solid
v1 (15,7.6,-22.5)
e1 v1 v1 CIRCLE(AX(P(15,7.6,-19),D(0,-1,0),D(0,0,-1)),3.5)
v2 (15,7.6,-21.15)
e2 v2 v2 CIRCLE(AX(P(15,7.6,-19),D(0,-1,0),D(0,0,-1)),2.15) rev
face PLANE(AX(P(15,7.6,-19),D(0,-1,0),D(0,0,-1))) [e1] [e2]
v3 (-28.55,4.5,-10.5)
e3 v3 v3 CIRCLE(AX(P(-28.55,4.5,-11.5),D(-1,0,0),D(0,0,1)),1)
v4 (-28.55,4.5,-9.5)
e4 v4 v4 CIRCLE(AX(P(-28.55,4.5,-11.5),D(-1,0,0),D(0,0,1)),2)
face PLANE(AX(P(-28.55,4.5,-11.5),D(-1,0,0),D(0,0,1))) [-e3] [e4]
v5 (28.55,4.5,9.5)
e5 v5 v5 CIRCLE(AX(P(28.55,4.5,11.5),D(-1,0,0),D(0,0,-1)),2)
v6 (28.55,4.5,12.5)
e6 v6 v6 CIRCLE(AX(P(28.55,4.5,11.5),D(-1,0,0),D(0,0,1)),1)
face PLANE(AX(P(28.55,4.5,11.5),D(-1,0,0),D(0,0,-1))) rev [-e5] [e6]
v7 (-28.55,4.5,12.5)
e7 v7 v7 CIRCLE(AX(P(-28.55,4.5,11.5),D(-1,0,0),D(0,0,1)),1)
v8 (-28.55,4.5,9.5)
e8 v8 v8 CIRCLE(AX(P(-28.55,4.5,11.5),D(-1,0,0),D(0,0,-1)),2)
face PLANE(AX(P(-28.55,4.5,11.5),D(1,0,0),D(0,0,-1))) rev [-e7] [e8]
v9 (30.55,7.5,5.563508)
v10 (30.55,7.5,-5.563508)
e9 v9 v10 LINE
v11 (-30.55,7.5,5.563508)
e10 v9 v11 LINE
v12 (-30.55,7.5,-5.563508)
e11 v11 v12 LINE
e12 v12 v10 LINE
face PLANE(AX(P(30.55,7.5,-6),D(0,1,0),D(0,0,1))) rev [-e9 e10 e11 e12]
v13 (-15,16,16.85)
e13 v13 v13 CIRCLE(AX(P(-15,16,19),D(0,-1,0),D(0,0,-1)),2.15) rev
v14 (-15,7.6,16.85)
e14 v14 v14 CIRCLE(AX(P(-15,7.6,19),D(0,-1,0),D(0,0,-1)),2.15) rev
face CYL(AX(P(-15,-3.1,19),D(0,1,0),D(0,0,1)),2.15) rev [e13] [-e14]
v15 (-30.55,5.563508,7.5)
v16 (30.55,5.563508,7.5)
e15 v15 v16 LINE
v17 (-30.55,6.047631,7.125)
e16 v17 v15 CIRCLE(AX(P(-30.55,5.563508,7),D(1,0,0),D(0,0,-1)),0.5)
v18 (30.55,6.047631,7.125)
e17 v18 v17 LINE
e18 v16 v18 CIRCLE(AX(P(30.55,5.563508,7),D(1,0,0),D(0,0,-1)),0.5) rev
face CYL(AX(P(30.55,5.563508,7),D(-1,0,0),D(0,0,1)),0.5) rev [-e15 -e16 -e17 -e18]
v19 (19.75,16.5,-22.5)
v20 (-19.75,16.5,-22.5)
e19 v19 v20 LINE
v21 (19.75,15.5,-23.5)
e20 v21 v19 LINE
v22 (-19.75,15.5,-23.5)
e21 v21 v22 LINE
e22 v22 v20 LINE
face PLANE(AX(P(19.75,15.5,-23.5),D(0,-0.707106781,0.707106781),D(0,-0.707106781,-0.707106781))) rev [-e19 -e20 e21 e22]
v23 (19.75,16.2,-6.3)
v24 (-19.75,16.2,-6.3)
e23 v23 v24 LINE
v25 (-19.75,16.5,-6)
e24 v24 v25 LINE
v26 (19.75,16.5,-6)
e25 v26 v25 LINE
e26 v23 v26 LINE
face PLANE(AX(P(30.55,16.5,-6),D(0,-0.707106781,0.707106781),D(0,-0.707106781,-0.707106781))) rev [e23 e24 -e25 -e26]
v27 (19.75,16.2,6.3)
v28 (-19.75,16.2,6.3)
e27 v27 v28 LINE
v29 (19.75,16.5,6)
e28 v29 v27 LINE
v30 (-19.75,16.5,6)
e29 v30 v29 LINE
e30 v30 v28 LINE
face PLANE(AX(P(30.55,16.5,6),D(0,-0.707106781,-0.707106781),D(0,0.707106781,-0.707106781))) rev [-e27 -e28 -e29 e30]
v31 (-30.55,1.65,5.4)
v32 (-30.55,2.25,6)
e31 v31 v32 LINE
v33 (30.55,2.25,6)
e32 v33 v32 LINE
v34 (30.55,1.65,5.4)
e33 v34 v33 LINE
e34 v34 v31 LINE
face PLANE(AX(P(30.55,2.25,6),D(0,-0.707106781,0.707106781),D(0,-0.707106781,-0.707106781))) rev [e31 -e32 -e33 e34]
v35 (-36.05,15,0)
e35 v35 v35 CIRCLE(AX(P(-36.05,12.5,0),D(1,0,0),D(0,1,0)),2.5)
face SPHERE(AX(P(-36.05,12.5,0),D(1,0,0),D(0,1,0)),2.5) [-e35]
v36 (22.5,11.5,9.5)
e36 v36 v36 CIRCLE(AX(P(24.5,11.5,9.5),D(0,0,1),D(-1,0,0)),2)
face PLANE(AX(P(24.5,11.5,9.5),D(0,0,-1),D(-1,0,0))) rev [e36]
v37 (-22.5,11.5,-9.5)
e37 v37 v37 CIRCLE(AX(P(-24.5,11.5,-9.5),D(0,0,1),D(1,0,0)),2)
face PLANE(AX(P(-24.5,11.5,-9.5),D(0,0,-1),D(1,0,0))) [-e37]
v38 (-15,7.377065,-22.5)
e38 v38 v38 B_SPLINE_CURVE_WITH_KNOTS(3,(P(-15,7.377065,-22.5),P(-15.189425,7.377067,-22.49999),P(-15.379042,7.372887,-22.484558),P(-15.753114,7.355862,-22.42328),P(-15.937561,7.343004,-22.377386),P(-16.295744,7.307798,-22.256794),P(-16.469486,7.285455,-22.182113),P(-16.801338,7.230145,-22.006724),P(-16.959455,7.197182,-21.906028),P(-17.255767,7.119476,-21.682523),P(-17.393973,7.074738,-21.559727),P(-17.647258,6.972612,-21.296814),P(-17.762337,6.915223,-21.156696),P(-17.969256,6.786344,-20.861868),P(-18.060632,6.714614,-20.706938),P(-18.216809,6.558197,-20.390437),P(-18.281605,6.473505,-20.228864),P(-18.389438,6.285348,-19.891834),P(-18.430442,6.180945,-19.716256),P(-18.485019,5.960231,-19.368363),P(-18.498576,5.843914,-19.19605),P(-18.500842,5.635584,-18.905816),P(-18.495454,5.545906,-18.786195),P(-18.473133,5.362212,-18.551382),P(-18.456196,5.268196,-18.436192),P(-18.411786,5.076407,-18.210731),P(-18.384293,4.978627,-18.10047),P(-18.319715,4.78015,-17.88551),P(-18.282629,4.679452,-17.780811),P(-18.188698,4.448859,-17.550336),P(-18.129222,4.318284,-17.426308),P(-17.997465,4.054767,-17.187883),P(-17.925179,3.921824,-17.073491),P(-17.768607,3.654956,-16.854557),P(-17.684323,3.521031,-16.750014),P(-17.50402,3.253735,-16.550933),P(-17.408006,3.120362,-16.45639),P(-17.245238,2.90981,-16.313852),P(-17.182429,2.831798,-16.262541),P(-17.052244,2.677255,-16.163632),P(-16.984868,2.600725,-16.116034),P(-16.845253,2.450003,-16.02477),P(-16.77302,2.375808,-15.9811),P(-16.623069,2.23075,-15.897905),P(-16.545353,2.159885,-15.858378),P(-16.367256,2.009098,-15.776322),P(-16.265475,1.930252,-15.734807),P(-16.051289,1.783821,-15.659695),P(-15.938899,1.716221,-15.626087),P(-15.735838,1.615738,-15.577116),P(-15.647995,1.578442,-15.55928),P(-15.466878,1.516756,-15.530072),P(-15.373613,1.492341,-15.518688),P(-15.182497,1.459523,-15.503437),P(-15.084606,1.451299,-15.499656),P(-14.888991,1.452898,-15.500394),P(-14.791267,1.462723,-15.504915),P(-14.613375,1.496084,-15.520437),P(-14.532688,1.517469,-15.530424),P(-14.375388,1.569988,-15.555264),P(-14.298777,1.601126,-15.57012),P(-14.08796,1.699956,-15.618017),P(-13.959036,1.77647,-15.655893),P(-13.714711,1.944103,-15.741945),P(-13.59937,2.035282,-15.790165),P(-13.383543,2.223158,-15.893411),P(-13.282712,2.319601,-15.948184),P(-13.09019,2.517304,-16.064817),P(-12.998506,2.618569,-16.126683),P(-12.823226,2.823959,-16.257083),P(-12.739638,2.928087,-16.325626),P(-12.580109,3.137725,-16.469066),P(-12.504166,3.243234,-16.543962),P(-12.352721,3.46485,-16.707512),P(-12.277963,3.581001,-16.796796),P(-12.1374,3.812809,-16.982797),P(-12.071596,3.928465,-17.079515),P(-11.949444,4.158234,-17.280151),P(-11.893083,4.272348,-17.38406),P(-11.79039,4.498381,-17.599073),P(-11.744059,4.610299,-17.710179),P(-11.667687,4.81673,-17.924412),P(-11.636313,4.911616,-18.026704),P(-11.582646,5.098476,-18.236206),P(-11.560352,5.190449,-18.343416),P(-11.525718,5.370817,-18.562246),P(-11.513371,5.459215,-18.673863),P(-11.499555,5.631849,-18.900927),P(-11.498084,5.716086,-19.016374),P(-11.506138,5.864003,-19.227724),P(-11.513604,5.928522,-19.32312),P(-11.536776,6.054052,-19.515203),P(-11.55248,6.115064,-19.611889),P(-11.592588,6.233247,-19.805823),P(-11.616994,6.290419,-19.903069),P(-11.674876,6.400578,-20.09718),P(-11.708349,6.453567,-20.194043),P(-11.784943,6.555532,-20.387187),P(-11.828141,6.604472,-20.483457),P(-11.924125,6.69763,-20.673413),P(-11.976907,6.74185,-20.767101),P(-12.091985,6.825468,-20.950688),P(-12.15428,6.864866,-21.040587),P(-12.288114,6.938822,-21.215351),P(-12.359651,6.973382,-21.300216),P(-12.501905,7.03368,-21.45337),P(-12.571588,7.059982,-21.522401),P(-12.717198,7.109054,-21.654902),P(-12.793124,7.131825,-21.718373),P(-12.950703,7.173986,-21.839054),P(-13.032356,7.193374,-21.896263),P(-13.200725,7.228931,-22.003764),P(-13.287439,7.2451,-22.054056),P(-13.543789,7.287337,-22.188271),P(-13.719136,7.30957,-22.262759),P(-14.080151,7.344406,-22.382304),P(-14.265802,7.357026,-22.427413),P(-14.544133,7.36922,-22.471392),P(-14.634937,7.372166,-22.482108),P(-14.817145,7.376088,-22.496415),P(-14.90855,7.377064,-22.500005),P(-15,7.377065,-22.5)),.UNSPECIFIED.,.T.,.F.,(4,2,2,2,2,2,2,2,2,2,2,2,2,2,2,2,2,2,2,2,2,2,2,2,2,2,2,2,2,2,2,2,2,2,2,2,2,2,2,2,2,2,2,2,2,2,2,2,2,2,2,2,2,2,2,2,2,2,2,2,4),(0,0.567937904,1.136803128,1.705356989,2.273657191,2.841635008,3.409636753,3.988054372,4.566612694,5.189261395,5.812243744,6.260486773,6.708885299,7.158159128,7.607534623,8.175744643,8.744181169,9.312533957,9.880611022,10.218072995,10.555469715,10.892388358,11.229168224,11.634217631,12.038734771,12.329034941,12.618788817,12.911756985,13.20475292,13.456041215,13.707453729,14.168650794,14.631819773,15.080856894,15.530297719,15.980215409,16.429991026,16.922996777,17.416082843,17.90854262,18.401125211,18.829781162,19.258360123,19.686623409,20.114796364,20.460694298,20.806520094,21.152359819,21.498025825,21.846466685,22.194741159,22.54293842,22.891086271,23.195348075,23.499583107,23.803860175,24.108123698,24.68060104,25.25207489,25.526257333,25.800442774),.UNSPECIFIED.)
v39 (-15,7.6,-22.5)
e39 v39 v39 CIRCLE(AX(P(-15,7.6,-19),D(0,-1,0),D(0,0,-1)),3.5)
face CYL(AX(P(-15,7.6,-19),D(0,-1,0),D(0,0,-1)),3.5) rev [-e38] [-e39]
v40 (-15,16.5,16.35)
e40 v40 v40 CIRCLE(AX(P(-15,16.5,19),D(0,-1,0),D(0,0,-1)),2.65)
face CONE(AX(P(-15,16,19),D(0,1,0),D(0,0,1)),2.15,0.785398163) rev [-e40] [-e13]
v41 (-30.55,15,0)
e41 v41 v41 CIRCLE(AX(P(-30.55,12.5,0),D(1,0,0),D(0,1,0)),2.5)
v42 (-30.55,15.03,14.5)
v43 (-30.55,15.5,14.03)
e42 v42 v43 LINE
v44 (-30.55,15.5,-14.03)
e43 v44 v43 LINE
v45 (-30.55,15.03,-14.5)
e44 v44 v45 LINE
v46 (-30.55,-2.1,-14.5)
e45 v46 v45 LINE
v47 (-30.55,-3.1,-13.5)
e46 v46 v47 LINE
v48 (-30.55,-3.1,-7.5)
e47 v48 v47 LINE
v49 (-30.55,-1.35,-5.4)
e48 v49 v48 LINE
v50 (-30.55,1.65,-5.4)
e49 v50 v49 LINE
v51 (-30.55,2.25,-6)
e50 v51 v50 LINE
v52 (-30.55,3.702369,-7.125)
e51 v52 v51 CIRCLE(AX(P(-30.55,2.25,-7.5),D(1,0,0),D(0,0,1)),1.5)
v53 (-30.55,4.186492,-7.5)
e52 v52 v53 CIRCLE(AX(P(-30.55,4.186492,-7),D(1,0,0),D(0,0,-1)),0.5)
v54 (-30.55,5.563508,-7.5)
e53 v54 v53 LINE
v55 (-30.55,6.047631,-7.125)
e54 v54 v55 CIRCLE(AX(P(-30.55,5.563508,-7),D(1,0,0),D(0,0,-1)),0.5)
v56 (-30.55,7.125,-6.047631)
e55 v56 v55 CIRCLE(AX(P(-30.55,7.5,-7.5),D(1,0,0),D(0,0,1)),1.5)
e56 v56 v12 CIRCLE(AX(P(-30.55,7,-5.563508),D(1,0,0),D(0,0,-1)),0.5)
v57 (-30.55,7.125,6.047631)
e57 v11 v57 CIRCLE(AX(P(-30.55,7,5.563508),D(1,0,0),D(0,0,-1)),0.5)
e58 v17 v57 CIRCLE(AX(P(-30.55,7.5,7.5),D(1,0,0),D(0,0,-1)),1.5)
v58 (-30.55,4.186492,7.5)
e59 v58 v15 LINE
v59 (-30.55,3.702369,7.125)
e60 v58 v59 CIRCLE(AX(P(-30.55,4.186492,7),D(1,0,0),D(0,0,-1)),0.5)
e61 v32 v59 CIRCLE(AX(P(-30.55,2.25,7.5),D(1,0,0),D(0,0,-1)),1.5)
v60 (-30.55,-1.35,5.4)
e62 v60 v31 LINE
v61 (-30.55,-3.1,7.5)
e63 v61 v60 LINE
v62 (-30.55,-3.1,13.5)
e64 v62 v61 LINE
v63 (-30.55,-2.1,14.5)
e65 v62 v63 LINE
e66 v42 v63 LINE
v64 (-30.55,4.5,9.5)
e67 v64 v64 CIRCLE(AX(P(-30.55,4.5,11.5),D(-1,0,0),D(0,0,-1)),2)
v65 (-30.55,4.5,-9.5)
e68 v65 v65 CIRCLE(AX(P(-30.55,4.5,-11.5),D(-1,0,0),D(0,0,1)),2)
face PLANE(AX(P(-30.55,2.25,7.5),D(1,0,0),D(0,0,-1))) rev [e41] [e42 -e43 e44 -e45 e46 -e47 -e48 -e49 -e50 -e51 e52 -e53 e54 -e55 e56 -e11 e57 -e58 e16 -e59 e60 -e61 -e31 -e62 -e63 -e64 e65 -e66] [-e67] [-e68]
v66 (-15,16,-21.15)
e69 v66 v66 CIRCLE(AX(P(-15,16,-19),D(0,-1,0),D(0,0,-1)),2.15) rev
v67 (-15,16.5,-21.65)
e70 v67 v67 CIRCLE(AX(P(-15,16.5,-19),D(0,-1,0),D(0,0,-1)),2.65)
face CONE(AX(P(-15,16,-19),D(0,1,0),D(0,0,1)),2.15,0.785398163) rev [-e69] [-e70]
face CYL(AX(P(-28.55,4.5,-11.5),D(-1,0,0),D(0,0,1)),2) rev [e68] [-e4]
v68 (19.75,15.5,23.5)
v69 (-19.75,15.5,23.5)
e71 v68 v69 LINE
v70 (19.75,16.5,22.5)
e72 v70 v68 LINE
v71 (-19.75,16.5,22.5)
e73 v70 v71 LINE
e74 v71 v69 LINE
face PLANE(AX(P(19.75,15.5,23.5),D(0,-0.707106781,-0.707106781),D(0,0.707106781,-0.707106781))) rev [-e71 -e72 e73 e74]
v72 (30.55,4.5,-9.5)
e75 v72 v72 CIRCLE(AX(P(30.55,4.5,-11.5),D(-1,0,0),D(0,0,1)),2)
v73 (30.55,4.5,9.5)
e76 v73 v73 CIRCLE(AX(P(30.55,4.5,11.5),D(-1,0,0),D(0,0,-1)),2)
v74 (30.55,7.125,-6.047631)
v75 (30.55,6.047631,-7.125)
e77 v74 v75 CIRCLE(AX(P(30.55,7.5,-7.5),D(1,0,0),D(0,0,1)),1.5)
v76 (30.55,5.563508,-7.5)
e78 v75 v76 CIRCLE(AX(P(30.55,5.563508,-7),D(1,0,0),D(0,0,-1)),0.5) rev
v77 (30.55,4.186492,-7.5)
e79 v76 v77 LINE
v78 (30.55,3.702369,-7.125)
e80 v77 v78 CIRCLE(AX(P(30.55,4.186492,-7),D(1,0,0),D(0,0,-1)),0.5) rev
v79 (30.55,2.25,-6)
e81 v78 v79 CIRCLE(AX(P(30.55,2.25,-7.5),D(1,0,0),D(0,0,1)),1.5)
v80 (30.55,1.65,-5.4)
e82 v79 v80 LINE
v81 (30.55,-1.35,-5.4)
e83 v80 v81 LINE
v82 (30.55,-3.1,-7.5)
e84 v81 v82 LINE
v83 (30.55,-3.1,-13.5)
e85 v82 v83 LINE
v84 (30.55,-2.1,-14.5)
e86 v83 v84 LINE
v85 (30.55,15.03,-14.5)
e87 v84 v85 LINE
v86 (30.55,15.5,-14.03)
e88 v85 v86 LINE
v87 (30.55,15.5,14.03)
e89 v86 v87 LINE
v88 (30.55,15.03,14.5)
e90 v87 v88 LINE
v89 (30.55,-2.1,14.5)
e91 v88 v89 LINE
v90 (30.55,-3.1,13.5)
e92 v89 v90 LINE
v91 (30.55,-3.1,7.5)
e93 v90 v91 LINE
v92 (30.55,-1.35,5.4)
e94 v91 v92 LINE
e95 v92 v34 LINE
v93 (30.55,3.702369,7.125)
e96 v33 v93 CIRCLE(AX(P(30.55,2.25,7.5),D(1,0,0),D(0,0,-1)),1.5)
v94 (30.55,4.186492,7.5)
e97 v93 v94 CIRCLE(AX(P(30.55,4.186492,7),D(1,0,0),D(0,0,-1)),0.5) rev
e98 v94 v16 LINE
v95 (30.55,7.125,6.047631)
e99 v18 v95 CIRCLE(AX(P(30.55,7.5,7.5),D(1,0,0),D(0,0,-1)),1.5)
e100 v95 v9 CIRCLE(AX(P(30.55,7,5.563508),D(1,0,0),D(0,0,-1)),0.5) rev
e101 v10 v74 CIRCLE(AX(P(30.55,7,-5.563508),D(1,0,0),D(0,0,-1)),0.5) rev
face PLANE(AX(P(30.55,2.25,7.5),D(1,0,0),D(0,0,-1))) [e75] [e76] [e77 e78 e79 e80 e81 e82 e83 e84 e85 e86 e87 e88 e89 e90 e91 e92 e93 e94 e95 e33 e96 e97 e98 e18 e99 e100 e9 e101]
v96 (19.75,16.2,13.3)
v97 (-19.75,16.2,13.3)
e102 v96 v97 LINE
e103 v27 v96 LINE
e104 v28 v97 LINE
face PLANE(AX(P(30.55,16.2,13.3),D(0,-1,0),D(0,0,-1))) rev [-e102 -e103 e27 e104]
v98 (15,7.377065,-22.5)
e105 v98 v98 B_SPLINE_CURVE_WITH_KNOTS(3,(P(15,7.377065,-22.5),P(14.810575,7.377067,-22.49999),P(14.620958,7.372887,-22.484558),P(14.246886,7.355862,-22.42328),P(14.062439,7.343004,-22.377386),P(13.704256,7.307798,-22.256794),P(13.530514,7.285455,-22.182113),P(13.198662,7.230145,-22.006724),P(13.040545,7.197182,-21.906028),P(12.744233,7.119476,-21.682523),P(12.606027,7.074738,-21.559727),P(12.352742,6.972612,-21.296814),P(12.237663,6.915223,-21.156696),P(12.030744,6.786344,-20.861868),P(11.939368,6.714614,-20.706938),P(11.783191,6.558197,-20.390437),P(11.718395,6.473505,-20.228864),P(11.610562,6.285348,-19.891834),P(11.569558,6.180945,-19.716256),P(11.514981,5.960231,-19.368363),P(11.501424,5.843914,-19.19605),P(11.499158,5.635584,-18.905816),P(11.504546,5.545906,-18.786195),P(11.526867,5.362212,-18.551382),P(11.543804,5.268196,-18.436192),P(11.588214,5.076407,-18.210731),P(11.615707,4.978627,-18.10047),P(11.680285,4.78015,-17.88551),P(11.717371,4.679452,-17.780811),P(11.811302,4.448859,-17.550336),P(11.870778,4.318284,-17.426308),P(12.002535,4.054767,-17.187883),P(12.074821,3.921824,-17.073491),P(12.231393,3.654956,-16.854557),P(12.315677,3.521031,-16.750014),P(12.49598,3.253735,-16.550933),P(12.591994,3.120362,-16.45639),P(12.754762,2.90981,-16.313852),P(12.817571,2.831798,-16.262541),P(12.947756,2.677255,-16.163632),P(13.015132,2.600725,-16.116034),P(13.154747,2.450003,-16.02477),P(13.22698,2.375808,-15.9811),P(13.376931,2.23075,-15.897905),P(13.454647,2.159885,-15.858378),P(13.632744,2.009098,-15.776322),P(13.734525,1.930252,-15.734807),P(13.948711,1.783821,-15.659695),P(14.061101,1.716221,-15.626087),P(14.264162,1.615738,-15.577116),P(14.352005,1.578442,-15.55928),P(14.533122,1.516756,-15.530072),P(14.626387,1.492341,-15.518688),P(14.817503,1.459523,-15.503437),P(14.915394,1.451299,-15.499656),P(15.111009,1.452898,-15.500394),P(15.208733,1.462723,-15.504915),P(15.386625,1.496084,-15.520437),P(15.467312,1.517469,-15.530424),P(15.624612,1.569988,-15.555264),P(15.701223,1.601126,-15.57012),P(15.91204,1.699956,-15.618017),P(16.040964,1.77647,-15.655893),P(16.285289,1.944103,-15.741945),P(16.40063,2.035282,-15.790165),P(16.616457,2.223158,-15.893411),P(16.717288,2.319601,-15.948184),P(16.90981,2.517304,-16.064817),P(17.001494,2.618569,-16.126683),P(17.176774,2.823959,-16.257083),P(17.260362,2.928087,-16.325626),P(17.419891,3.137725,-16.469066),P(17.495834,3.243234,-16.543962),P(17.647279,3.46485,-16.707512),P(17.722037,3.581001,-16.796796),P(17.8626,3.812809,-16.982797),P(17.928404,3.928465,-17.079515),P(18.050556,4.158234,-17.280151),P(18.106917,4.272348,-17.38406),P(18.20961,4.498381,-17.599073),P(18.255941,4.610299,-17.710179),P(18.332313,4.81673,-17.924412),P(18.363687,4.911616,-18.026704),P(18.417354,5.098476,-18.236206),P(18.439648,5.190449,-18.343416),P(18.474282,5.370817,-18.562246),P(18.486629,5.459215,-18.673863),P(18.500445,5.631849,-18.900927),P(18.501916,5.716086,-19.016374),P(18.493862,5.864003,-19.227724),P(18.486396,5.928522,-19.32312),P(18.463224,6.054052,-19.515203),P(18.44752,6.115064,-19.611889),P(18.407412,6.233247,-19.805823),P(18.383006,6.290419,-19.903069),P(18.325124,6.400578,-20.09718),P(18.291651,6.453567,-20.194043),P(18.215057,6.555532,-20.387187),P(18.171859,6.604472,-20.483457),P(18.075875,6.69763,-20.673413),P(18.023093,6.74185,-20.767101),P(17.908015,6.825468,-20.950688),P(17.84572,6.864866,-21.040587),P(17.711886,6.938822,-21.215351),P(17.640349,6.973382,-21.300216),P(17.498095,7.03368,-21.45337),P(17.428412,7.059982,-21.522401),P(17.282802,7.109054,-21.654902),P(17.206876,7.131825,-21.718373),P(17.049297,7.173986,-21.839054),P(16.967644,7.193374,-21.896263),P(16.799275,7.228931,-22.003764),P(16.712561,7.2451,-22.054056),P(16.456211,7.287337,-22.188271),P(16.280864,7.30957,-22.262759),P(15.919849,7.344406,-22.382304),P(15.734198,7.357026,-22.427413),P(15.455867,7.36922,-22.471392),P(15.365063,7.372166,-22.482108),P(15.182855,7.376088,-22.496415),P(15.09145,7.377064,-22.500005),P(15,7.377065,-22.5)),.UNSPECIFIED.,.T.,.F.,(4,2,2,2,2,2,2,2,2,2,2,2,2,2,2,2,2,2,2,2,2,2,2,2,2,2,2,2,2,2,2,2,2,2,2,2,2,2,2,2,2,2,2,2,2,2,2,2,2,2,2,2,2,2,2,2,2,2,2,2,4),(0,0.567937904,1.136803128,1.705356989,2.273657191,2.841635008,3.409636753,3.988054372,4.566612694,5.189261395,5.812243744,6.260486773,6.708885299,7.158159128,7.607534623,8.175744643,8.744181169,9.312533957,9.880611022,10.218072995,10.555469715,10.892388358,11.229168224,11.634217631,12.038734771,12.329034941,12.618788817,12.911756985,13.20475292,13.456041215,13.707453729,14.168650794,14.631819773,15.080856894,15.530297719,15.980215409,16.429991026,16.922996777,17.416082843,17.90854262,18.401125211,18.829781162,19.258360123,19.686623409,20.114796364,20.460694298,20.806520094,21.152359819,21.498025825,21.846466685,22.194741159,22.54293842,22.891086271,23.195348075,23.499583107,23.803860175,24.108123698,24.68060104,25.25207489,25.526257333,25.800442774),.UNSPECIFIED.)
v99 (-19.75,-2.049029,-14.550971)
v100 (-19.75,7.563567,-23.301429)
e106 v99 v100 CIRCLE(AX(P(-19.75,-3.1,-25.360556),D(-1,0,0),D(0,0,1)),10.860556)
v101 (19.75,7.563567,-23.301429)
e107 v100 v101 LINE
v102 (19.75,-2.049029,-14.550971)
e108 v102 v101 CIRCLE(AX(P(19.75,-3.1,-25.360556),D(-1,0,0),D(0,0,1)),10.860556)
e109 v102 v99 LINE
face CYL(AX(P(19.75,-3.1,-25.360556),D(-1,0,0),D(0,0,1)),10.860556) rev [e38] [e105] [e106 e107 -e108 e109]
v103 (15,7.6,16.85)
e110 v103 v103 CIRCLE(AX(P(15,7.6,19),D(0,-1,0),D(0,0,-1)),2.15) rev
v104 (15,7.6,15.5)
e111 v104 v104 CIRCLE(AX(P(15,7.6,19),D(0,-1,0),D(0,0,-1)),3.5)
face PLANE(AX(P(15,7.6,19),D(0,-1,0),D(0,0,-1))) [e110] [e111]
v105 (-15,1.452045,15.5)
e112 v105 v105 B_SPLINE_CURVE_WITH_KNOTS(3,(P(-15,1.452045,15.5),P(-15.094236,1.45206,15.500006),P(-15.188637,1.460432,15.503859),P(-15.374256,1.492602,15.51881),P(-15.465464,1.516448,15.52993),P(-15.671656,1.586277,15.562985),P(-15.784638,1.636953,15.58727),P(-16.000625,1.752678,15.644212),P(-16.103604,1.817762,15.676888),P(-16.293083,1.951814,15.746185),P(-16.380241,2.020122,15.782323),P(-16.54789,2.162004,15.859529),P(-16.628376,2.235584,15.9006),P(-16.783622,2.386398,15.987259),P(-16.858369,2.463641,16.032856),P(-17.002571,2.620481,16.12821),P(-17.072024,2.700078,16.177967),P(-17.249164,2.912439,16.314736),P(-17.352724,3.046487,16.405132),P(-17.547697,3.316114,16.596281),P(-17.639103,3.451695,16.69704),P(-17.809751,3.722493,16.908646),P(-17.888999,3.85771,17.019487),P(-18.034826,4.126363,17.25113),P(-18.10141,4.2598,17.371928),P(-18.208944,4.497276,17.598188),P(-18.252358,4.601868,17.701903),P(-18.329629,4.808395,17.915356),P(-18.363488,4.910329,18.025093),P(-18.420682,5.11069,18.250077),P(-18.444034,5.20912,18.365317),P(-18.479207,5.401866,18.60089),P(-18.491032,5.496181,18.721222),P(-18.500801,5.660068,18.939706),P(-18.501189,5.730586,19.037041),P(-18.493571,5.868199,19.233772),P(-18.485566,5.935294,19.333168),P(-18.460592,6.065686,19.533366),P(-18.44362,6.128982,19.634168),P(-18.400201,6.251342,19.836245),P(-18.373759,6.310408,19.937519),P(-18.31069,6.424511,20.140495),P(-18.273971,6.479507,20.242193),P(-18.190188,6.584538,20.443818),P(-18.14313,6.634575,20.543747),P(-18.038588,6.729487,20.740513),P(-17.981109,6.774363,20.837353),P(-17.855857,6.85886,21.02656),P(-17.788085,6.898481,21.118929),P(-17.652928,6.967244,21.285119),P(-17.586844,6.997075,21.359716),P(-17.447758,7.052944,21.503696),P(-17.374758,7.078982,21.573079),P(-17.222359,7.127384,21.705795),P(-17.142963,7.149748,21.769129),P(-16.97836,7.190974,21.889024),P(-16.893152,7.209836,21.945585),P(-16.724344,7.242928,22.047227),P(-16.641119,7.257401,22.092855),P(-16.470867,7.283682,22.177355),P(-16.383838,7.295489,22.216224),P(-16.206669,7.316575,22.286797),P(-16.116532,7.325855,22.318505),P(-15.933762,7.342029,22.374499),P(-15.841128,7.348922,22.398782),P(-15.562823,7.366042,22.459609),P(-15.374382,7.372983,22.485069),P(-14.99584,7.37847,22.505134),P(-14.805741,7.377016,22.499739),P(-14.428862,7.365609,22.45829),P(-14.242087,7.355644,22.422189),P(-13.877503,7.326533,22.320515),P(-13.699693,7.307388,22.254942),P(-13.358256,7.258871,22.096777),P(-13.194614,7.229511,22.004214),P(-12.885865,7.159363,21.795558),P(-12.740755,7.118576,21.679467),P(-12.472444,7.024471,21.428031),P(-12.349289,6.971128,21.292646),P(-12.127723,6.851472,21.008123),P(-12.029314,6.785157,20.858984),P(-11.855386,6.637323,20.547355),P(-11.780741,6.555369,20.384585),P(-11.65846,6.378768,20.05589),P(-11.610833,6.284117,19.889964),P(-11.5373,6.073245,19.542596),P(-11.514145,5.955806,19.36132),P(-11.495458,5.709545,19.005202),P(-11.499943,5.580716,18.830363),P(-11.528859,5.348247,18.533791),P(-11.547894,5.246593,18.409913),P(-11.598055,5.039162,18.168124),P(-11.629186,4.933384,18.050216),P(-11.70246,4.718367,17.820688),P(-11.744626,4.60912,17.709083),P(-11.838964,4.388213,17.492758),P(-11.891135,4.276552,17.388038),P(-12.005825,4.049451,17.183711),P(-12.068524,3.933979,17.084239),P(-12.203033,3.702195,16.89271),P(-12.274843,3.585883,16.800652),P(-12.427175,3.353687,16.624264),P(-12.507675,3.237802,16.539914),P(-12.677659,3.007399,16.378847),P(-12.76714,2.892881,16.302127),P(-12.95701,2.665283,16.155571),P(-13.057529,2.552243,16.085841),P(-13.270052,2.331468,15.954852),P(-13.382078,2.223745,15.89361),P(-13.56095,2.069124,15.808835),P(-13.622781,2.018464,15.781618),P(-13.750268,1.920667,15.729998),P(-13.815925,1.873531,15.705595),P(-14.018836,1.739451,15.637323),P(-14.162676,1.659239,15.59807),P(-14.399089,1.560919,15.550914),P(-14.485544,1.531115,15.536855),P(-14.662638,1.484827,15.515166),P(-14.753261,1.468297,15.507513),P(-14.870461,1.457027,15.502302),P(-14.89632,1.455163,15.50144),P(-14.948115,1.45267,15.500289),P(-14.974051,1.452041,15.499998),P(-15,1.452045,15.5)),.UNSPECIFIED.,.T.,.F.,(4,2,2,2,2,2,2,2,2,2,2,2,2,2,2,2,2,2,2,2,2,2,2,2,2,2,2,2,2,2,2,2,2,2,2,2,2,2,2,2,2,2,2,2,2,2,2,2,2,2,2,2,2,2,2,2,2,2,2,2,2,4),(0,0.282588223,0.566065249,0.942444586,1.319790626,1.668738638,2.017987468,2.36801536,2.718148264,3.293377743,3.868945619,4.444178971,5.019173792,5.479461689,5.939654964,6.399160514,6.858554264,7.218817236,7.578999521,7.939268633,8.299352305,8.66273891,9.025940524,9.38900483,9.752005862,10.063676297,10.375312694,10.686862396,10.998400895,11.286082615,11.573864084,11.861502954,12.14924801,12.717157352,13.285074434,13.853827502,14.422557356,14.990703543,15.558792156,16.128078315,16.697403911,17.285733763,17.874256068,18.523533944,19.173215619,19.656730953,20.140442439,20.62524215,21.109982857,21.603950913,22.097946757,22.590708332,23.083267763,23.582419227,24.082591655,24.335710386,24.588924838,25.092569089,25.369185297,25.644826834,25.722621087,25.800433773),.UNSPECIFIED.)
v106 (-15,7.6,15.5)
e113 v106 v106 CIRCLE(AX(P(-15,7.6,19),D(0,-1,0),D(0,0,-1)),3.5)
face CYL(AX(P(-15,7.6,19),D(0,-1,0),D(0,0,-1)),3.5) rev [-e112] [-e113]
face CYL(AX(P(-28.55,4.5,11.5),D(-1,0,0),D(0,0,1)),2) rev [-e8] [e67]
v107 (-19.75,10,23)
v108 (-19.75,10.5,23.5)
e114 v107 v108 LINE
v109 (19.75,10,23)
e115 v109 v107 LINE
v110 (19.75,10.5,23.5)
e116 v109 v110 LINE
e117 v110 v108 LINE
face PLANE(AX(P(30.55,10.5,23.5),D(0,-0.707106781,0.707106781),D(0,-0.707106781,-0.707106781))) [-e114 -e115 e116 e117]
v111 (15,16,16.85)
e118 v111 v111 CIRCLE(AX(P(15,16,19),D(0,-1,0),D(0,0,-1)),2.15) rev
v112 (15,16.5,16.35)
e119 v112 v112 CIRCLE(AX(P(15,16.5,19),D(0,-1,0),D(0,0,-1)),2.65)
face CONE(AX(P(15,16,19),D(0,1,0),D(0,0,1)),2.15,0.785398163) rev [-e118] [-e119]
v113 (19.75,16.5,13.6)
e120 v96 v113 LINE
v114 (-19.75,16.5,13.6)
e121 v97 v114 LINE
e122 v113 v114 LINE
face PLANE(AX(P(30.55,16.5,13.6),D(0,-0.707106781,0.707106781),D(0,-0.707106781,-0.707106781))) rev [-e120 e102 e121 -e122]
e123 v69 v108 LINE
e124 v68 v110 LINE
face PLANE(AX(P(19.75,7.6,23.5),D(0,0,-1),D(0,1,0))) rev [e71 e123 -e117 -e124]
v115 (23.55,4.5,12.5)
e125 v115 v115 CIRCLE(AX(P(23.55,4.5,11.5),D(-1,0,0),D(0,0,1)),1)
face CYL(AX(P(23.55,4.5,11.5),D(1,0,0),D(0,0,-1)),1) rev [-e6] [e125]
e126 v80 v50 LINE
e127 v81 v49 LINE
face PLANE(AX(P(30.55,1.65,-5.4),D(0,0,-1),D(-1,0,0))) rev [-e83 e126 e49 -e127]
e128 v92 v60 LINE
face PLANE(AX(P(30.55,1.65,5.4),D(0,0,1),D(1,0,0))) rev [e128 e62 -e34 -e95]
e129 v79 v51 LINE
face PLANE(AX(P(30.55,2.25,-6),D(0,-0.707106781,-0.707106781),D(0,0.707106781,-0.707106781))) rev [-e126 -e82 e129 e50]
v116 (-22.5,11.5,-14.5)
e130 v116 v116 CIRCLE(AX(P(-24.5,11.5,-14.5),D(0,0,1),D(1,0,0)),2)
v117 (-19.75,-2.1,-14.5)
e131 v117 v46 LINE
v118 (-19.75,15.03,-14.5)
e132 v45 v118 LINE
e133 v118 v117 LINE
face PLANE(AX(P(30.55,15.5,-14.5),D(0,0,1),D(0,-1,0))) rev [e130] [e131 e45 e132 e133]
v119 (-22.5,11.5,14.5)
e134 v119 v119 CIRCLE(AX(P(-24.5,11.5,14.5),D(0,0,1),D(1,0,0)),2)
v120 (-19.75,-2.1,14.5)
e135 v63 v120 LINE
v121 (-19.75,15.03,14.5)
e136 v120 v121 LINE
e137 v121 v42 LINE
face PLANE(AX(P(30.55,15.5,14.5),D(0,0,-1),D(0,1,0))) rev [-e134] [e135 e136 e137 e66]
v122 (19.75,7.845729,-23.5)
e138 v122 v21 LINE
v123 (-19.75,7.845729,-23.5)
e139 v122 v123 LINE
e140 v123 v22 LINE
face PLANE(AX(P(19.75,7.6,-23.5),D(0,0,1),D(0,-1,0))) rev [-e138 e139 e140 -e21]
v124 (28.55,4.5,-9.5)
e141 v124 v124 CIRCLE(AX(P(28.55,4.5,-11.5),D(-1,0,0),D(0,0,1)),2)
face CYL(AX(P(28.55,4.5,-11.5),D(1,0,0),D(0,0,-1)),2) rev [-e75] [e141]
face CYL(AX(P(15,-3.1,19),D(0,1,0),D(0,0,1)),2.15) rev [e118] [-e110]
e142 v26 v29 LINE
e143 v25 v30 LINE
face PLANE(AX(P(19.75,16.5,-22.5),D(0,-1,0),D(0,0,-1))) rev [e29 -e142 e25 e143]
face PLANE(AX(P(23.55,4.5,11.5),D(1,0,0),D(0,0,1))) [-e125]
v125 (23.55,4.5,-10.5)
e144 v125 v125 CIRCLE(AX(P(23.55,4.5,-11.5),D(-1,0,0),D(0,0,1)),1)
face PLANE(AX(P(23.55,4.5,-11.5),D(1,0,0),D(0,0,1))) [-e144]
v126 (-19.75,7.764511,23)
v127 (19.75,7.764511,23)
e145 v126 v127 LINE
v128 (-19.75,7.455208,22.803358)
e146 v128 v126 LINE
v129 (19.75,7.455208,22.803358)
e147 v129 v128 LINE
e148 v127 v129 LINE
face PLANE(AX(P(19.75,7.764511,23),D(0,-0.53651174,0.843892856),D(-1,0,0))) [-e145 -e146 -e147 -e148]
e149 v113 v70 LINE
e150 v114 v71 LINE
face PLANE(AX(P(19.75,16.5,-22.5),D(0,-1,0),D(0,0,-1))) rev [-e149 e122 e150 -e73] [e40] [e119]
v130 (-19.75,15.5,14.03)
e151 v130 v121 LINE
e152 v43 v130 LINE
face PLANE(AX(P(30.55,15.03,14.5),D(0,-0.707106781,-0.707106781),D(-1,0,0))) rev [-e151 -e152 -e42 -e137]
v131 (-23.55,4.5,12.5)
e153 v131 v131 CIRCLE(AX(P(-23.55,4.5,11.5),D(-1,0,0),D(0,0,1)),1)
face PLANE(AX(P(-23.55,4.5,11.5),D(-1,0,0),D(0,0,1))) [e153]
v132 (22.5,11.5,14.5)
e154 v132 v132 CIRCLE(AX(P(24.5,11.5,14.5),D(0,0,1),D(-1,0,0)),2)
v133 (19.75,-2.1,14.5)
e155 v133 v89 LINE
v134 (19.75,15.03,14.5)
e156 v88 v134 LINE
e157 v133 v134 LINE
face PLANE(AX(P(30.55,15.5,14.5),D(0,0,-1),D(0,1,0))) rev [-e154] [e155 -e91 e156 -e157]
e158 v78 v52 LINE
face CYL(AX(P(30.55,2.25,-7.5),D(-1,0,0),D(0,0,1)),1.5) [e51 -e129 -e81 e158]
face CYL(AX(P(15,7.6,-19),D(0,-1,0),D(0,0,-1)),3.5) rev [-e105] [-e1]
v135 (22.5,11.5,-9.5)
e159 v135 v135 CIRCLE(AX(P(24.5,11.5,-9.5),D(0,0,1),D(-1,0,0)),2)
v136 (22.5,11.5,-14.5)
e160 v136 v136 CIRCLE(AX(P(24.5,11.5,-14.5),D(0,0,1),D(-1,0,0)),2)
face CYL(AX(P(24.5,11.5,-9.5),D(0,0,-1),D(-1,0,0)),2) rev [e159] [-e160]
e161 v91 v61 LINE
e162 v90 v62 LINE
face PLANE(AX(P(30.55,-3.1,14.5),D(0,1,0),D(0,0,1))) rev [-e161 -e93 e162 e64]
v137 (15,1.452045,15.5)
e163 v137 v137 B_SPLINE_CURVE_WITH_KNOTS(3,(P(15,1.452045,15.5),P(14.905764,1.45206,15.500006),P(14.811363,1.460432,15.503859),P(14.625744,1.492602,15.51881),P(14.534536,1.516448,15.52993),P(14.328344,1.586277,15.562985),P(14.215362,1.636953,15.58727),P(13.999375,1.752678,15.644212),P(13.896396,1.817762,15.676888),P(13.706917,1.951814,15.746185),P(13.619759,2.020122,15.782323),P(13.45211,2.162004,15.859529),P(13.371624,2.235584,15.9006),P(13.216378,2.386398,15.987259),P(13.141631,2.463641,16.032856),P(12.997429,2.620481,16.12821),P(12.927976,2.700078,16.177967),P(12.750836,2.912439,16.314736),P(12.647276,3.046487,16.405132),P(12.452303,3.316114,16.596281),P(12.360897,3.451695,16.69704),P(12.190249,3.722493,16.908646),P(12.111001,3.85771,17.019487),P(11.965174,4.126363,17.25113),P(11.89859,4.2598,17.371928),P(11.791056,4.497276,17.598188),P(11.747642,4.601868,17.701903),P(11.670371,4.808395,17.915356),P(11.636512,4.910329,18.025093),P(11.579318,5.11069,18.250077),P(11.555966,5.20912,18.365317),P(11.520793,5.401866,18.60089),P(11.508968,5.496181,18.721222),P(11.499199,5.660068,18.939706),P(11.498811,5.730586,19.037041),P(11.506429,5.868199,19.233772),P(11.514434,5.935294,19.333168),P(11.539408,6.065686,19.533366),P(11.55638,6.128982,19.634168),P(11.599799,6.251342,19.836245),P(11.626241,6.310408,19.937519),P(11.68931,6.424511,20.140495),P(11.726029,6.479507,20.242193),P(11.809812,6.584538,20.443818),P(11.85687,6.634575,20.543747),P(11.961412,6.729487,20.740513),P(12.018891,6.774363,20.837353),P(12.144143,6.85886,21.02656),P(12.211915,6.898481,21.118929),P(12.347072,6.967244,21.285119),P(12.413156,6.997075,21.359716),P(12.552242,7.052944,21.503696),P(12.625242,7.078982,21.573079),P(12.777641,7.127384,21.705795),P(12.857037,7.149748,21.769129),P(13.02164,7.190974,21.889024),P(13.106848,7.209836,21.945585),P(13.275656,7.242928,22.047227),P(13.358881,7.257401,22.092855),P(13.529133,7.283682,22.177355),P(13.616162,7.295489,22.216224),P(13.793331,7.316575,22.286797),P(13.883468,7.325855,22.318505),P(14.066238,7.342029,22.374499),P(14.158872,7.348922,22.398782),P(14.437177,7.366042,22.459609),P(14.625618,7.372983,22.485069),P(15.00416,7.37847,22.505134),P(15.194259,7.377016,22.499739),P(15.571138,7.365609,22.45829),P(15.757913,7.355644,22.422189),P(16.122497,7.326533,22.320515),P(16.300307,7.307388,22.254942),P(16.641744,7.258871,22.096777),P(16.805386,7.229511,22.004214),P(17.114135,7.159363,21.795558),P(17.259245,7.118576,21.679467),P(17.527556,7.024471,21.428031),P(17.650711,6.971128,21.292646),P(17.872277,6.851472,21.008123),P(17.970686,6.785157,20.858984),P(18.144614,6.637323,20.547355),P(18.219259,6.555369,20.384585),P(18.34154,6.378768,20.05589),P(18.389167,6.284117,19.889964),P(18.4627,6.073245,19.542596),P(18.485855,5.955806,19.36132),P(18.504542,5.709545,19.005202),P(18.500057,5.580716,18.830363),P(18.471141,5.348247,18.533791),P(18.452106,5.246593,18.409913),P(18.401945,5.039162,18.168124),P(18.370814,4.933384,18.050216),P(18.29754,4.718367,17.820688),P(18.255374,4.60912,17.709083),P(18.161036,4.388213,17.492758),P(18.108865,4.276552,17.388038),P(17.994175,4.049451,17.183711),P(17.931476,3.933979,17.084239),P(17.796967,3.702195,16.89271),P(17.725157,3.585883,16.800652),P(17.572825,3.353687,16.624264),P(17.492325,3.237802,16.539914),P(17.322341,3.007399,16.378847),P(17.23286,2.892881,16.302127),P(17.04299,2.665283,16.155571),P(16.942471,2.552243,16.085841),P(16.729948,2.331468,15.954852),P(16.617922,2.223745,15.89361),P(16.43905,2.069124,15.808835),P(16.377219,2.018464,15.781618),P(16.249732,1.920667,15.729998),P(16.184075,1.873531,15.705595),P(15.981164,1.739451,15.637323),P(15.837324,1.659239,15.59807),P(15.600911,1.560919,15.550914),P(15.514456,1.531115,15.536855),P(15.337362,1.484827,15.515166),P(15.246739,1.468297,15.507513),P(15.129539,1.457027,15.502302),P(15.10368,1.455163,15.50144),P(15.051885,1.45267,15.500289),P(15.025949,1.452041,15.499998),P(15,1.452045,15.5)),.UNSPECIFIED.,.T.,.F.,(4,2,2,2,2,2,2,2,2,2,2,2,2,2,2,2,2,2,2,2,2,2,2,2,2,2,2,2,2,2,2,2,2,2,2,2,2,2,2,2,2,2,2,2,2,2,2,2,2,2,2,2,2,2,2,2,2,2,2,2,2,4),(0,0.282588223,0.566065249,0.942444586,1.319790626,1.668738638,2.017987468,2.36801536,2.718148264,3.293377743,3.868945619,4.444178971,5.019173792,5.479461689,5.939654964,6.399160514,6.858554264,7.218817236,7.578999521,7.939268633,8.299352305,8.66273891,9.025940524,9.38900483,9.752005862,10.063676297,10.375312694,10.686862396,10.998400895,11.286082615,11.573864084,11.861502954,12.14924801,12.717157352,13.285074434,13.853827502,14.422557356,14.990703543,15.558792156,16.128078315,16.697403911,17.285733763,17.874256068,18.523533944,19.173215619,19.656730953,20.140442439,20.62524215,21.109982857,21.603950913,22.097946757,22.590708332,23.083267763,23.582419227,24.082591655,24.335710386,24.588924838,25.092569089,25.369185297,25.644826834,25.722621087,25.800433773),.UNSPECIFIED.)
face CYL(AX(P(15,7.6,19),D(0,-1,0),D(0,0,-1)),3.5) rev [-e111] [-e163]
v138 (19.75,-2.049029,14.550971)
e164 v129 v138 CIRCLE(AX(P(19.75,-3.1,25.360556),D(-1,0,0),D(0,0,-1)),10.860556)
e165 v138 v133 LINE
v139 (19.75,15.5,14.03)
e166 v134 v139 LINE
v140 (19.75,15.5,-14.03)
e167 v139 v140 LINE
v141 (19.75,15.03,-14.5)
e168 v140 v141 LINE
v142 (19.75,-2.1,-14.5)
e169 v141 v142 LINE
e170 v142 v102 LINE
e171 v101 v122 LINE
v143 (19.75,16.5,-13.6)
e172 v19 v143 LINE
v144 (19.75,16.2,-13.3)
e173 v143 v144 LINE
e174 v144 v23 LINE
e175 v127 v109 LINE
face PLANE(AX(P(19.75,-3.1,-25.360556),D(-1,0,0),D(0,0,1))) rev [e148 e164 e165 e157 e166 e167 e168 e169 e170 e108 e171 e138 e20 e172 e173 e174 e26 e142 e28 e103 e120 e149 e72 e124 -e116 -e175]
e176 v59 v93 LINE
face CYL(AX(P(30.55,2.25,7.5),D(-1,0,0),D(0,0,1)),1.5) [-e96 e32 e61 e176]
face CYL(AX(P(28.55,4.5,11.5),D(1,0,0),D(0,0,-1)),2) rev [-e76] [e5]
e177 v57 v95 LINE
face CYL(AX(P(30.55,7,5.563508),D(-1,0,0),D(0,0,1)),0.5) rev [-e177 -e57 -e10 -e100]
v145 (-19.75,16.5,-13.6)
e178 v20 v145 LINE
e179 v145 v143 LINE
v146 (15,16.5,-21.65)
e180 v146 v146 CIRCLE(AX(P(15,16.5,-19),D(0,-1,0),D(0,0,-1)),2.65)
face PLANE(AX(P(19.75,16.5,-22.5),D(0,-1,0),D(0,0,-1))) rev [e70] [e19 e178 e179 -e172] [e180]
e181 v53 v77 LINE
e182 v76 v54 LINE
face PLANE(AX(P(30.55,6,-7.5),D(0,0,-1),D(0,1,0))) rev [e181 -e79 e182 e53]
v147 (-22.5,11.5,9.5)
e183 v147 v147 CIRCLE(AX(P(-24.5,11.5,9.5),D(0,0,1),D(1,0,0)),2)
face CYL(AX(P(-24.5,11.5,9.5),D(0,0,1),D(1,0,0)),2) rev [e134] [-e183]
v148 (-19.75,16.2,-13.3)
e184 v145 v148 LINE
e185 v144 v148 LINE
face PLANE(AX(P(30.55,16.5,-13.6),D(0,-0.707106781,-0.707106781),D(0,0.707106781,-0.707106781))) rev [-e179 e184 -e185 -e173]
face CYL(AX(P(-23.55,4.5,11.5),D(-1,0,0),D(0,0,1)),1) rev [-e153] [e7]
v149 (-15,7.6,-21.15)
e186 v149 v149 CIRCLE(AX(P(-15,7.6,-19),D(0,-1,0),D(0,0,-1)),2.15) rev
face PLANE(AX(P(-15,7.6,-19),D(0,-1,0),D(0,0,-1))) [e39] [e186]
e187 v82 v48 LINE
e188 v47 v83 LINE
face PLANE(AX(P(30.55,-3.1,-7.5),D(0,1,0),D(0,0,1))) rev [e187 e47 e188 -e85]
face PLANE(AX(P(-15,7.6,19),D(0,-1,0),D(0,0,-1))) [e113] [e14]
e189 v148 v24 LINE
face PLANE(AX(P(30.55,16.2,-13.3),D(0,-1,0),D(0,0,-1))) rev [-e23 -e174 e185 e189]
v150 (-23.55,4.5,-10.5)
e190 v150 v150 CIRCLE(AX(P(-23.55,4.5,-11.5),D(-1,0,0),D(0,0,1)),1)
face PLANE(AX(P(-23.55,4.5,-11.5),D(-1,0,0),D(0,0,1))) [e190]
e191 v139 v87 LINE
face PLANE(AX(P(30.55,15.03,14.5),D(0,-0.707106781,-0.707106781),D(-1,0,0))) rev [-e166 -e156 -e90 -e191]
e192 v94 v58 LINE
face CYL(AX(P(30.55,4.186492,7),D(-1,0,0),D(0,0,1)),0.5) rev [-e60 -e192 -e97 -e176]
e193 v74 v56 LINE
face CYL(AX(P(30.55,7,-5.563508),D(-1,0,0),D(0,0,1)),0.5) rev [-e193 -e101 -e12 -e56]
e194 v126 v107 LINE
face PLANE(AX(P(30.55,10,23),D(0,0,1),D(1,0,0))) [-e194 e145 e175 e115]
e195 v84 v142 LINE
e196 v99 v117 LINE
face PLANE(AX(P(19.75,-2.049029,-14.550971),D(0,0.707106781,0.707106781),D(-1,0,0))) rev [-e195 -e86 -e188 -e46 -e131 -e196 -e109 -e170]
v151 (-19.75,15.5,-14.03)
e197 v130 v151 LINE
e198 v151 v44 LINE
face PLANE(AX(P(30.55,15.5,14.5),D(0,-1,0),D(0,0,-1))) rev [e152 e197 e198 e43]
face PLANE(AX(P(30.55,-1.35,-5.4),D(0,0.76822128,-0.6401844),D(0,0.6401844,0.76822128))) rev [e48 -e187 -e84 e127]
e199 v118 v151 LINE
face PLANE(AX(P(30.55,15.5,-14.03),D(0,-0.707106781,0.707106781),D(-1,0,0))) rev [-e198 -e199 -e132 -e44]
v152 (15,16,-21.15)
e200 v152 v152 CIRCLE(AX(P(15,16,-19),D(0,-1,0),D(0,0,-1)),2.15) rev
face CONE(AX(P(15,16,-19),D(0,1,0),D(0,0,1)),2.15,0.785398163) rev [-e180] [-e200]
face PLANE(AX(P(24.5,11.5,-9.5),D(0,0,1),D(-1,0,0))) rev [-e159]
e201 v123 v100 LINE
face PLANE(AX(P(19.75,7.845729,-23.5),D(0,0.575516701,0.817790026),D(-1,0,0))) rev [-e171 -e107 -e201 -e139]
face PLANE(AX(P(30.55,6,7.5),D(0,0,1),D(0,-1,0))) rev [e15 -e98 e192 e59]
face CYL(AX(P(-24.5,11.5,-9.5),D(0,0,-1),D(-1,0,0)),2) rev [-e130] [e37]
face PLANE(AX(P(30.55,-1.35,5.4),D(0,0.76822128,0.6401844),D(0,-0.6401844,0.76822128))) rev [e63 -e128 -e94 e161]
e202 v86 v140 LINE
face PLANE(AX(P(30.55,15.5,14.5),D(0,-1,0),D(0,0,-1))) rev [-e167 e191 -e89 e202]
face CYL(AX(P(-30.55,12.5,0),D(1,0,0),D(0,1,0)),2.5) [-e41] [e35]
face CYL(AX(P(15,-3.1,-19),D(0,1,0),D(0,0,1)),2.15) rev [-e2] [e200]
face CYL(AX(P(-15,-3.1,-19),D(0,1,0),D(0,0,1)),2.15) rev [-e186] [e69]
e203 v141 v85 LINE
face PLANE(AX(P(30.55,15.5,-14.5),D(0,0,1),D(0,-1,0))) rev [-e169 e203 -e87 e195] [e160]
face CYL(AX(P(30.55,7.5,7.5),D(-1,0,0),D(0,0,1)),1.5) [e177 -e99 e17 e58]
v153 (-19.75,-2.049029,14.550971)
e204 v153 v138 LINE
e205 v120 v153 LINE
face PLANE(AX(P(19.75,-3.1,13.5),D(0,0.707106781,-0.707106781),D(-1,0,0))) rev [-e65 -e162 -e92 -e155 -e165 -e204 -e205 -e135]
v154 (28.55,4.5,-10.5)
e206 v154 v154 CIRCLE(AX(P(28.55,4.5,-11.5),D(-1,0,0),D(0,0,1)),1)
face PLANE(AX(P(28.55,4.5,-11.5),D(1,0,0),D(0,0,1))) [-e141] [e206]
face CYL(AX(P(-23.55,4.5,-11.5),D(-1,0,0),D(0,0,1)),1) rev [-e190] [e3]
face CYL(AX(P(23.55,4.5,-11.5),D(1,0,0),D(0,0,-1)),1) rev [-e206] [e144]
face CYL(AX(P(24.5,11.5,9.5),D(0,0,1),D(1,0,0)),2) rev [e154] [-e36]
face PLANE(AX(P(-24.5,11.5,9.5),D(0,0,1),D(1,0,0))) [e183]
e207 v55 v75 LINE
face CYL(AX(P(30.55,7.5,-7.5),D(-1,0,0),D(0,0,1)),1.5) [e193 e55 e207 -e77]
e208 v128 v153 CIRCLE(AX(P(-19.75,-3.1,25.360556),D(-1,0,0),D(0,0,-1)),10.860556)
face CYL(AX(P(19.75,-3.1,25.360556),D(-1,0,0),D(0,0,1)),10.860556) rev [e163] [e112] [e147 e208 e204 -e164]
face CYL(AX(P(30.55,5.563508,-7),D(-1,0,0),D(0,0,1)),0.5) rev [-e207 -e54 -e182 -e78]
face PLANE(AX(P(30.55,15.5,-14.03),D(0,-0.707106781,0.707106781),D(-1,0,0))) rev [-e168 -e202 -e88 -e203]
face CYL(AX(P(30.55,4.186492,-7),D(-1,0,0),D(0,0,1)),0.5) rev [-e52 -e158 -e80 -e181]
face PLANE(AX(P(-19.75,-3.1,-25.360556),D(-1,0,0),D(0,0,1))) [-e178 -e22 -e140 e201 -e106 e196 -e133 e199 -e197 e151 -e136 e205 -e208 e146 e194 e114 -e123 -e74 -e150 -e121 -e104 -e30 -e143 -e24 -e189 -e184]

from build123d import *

# Parameters (mm, degrees)
EXTRUDE_1_DEPTH          = 30.55
EXTRUDE_2_DEPTH          = 19.75
SKETCH_14_R              = 2.15
CUT_EXTRUDE_7_DEPTH      = 44.240172294
CUT_EXTRUDE_2_DEPTH      = 42.926155416
CUT_EXTRUDE_2_DEPTH_BACK = 42.926155416
SKETCH_13_R              = 2
CUT_EXTRUDE_6_DEPTH      = 2
SKETCH_16_R              = 1
CUT_EXTRUDE_11_DEPTH     = 5
SKETCH_12_R              = 2
CUT_EXTRUDE_5_DEPTH      = 5
SKETCH_15_R              = 3.5
CUT_EXTRUDE_10_DEPTH     = 10.7
CUT_EXTRUDE_8_DEPTH      = 58.918822542
CHAMFER_1_SIZE           = 0.47
CHAMFER_2_SIZE           = 0.26359415
CHAMFER_2_SIZE_2         = 0.24572937
CHAMFER_START            = -13
CHAMFER_3_OUTLINE_W      = 64
CHAMFER_3_OUTLINE_H      = 21.737972568
CHAMFER_3_DEPTH          = 1.262027432
CHAMFER_START_2          = 3.111269837
CHAMFER_3_2_DEPTH        = 24.465894629
CHAMFER_4_SIZE           = 0.5
FILLET_1_R               = 0.5


with BuildPart() as part:
    # 草图1 → 凸台-拉伸1 (new, symmetric)
    with BuildSketch(Plane(origin=(0, 0, 0), x_dir=(0, 0, -1), z_dir=(1, 0, 0))):
        with BuildLine():
            Line((-14.5, 15.5), (14.5, 15.5))
            Line((14.5, 15.5), (14.5, -3.1))
            Line((14.5, -3.1), (7.5, -3.1))
            Line((7.5, -3.1), (5.4, -1.35))
            Line((5.4, -1.35), (5.4, 1.65))
            Line((5.4, 1.65), (6, 2.25))
            ThreePointArc((6, 2.25), (6.439339828, 3.310660172), (7.5, 3.75))
            Line((7.5, 3.75), (7.5, 6))
            ThreePointArc((7.5, 6), (6.439339828, 6.439339828), (6, 7.5))
            Line((6, 7.5), (-6, 7.5))
            ThreePointArc((-6, 7.5), (-6.439339828, 6.439339828), (-7.5, 6))
            Line((-7.5, 6), (-7.5, 3.75))
            ThreePointArc((-7.5, 3.75), (-6.439339828, 3.310660172), (-6, 2.25))
            Line((-6, 2.25), (-5.4, 1.65))
            Line((-5.4, 1.65), (-5.4, -1.35))
            Line((-5.4, -1.35), (-7.5, -3.1))
            Line((-7.5, -3.1), (-14.5, -3.1))
            Line((-14.5, -3.1), (-14.5, 15.5))
        make_face()
    extrude(amount=EXTRUDE_1_DEPTH, both=True)

    # 草图2 → 凸台-拉伸2 (add, symmetric)
    with BuildSketch(Plane(origin=(0, 0, 0), x_dir=(0, 0, -1), z_dir=(1, 0, 0))):
        with BuildLine():
            Line((23.5, 7.6), (23.5, 15.5))
            Line((23.5, 15.5), (22.5, 16.5))
            Line((22.5, 16.5), (-22.5, 16.5))
            Line((-22.5, 16.5), (-23.5, 15.5))
            Line((-23.5, 15.5), (-23.5, 7.6))
            ThreePointArc((-23.5, 7.6), (-17.049167767, 3.890886925), (-14.5, -3.1))
            Line((-14.5, -3.1), (-14.5, 15.5))
            Line((-14.5, 15.5), (14.5, 15.5))
            Line((14.5, 15.5), (14.5, -3.1))
            ThreePointArc((14.5, -3.1), (17.049167767, 3.890886925), (23.5, 7.6))
        make_face()
    extrude(amount=EXTRUDE_2_DEPTH, both=True)

    # 草图14 → 切除-拉伸7 (cut, through all)
    with BuildSketch(Plane(origin=(0, 16.5, 0), x_dir=(1, 0, 0), z_dir=(0, 1, 0))):
        with Locations(Location((15, 19, 0), (0, 0, 270))):
            Circle(SKETCH_14_R)
        with Locations(Location((15, -19, 0), (0, 0, 270))):
            Circle(SKETCH_14_R)
        with Locations(Location((-15, -19, 0), (0, 0, 270))):
            Circle(SKETCH_14_R)
        with Locations(Location((-15, 19, 0), (0, 0, 270))):
            Circle(SKETCH_14_R)
    extrude(amount=-CUT_EXTRUDE_7_DEPTH, mode=Mode.SUBTRACT)

    # 草图5 → 切除-拉伸2 (cut, two sides: drawn at the far end of the back side and taken through both)
    with BuildSketch(Plane(origin=(0, 0, 0), x_dir=(0, 0, -1), z_dir=(1, 0, 0)).offset(-CUT_EXTRUDE_2_DEPTH_BACK)):
        Polygon((-23, 10), (-23, 7.1), (-23.5, 7.6), (-23.5, 10.5), align=None)
    extrude(amount=CUT_EXTRUDE_2_DEPTH + CUT_EXTRUDE_2_DEPTH_BACK, mode=Mode.SUBTRACT)

    # 草图18 → 旋转1 (revolve)
    with BuildSketch(Plane.XY):
        with BuildLine():
            Line((-30.55, 12.5), (-38.55, 12.5))
            ThreePointArc((-38.55, 12.5), (-37.817766953, 14.267766953), (-36.05, 15))
            Line((-36.05, 15), (-30.55, 15))
            Line((-30.55, 15), (-30.55, 12.5))
        make_face()
    revolve(axis=Axis((-30.55, 12.5, 0), (-1, 0, 0)))

    # 草图13 → 切除-拉伸6 (cut)
    with BuildSketch(Plane.ZY.offset(30.55)):
        with Locations((-11.5, 4.5)):
            Circle(SKETCH_13_R)
        with Locations(Location((11.5, 4.5, 0), (0, 0, 180))):
            Circle(SKETCH_13_R)
    cut_extrude_6 = extrude(amount=-CUT_EXTRUDE_6_DEPTH, mode=Mode.SUBTRACT)

    # 草图16 → 切除-拉伸11 (cut)
    with BuildSketch(Plane.ZY.offset(28.55)):
        with Locations((-11.5, 4.5)):
            Circle(SKETCH_16_R)
        with Locations((11.5, 4.5)):
            Circle(SKETCH_16_R)
    cut_extrude_11 = extrude(amount=-CUT_EXTRUDE_11_DEPTH, mode=Mode.SUBTRACT)

    # 镜向3: 切除-拉伸6, 切除-拉伸11 across plane
    add(cut_extrude_6.mirror(Plane(origin=(0, 0, 0), x_dir=(0, 0, 1), z_dir=(1, 0, 0))), mode=Mode.SUBTRACT)
    add(cut_extrude_11.mirror(Plane(origin=(0, 0, 0), x_dir=(0, 0, 1), z_dir=(1, 0, 0))), mode=Mode.SUBTRACT)

    # 草图12 → 切除-拉伸5 (cut)
    with BuildSketch(Plane.XY.offset(14.5)):
        with Locations((-24.5, 11.5)):
            Circle(SKETCH_12_R)
        with Locations(Location((24.5, 11.5, 0), (0, 0, 180))):
            Circle(SKETCH_12_R)
    cut_extrude_5 = extrude(amount=-CUT_EXTRUDE_5_DEPTH, mode=Mode.SUBTRACT)

    # 草图15 → 切除-拉伸10 (cut)
    with BuildSketch(Plane.XZ.offset(3.1)):
        with Locations(Location((15, 19, 0), (0, 0, 270))):
            Circle(SKETCH_15_R)
        with Locations(Location((15, -19, 0), (0, 0, 270))):
            Circle(SKETCH_15_R)
        with Locations(Location((-15, 19, 0), (0, 0, 270))):
            Circle(SKETCH_15_R)
        with Locations(Location((-15, -19, 0), (0, 0, 270))):
            Circle(SKETCH_15_R)
    extrude(amount=-CUT_EXTRUDE_10_DEPTH, mode=Mode.SUBTRACT)

    # 镜向4: 切除-拉伸5 across plane
    add(cut_extrude_5.mirror(Plane.XY), mode=Mode.SUBTRACT)

    # 草图3 → 切除-拉伸8 (cut, through all)
    with BuildSketch(Plane.ZY.offset(19.75)):
        Polygon((-6, 16.5), (-6.3, 16.2), (-13.3, 16.2), (-13.6, 16.5), align=None)
        Polygon((13.6, 16.5), (13.3, 16.2), (6.3, 16.2), (6, 16.5), align=None)
    extrude(amount=-CUT_EXTRUDE_8_DEPTH, mode=Mode.SUBTRACT)

    # 倒角1
    chamfer_1_edges = [part.edges().sort_by_distance(p)[0] for p in [
        (25.15, -3.1, 14.5),
        (25.15, 15.5, 14.5),
        (25.15, 15.5, -14.5),
        (25.15, -3.1, -14.5),
        (-25.15, -3.1, 14.5),
        (-25.15, 15.5, 14.5),
        (-25.15, 15.5, -14.5),
        (-25.15, -3.1, -14.5),
    ]]
    chamfer(chamfer_1_edges, length=CHAMFER_1_SIZE)

    # 倒角2
    # the kernel refuses this chamfer: 0.26359415, 0.24572937, 0.2 mm, written as the material it takes off along each edge
    with BuildSketch(Plane(origin=(-20.431376675, 7.500917151, 23), x_dir=(0, -0.22641410518634636, -0.97403113552528), z_dir=(1, 0, 0))) as chamfer_2_piece_1:
        with BuildLine():
            Line((0.201885125, 0), (-CHAMFER_2_SIZE * 0.226414105253, CHAMFER_2_SIZE * 0.974031135813))
            Line((-CHAMFER_2_SIZE * 0.226414105253, CHAMFER_2_SIZE * 0.974031135813), (0, 0))
            ThreePointArc((0, 0), (0.104706276, 0.000468459), (0.201885125, 0))
        make_face()
    extrude(amount=40.862753349, mode=Mode.SUBTRACT)
    with BuildSketch(Plane(origin=(-20.384576532, 7.6, -23.5), x_dir=(0, -0.18046272794534762, 0.9835818236539975), z_dir=(1, 0, 0))) as chamfer_2_piece_2:
        with BuildLine():
            Line((0.201885125, 0), (-CHAMFER_2_SIZE_2 * 0.180462727665, -CHAMFER_2_SIZE_2 * 0.983581822127))
            Line((-CHAMFER_2_SIZE_2 * 0.180462727665, -CHAMFER_2_SIZE_2 * 0.983581822127), (0, 0))
            ThreePointArc((0, 0), (0.104451114, -0.000468545), (0.201885125, 0))
        make_face()
    extrude(amount=40.769153064, mode=Mode.SUBTRACT)

    # 倒角3: read off the stored shape, not the designer's step
    # 倒角3 outline → 倒角3 (cut)
    with BuildSketch(Plane(origin=(0, 0, 0), x_dir=(1, 0, 0), z_dir=(0, 0.707106781186547, 0.707106781186548)).offset(CHAMFER_START)):
        with Locations((0, -0.868986284)):
            Rectangle(CHAMFER_3_OUTLINE_W, CHAMFER_3_OUTLINE_H)
    extrude(amount=CHAMFER_3_DEPTH, mode=Mode.SUBTRACT)

    # Chamfer 3 2 outline → Chamfer 3 2 (cut)
    with BuildSketch(Plane(origin=(0, 0, 0), x_dir=(1, 0, 0), z_dir=(0, 0.707106781186547, 0.707106781186548)).offset(CHAMFER_START_2)):
        Polygon((32, -11.737972568), (-32, -11.737972568), (-32, -12.112739162), (-19.75, -12.112739162), (-19.75, -14), (19.75, -14), (19.75, -12.112739162), (32, -12.112739162), align=None)
    extrude(amount=CHAMFER_3_2_DEPTH, mode=Mode.SUBTRACT)

    # 倒角4
    chamfer_4_edges = [part.edges().sort_by_distance(p)[0] for p in [
        (15, 16.5, -21.15),
        (15, 16.5, 16.85),
        (-15, 16.5, 16.85),
        (-15, 16.5, -21.15),
    ]]
    chamfer(chamfer_4_edges, length=CHAMFER_4_SIZE)

    # 圆角1
    fillet_1_edges = [part.edges().sort_by_distance(p)[0] for p in [
        (0, 3.75, -7.5),
        (0, 6, -7.5),
        (0, 7.5, -6),
        (0, 7.5, 6),
        (0, 6, 7.5),
        (0, 3.75, 7.5),
    ]]
    fillet(fillet_1_edges, radius=FILLET_1_R)


solid = part.part
